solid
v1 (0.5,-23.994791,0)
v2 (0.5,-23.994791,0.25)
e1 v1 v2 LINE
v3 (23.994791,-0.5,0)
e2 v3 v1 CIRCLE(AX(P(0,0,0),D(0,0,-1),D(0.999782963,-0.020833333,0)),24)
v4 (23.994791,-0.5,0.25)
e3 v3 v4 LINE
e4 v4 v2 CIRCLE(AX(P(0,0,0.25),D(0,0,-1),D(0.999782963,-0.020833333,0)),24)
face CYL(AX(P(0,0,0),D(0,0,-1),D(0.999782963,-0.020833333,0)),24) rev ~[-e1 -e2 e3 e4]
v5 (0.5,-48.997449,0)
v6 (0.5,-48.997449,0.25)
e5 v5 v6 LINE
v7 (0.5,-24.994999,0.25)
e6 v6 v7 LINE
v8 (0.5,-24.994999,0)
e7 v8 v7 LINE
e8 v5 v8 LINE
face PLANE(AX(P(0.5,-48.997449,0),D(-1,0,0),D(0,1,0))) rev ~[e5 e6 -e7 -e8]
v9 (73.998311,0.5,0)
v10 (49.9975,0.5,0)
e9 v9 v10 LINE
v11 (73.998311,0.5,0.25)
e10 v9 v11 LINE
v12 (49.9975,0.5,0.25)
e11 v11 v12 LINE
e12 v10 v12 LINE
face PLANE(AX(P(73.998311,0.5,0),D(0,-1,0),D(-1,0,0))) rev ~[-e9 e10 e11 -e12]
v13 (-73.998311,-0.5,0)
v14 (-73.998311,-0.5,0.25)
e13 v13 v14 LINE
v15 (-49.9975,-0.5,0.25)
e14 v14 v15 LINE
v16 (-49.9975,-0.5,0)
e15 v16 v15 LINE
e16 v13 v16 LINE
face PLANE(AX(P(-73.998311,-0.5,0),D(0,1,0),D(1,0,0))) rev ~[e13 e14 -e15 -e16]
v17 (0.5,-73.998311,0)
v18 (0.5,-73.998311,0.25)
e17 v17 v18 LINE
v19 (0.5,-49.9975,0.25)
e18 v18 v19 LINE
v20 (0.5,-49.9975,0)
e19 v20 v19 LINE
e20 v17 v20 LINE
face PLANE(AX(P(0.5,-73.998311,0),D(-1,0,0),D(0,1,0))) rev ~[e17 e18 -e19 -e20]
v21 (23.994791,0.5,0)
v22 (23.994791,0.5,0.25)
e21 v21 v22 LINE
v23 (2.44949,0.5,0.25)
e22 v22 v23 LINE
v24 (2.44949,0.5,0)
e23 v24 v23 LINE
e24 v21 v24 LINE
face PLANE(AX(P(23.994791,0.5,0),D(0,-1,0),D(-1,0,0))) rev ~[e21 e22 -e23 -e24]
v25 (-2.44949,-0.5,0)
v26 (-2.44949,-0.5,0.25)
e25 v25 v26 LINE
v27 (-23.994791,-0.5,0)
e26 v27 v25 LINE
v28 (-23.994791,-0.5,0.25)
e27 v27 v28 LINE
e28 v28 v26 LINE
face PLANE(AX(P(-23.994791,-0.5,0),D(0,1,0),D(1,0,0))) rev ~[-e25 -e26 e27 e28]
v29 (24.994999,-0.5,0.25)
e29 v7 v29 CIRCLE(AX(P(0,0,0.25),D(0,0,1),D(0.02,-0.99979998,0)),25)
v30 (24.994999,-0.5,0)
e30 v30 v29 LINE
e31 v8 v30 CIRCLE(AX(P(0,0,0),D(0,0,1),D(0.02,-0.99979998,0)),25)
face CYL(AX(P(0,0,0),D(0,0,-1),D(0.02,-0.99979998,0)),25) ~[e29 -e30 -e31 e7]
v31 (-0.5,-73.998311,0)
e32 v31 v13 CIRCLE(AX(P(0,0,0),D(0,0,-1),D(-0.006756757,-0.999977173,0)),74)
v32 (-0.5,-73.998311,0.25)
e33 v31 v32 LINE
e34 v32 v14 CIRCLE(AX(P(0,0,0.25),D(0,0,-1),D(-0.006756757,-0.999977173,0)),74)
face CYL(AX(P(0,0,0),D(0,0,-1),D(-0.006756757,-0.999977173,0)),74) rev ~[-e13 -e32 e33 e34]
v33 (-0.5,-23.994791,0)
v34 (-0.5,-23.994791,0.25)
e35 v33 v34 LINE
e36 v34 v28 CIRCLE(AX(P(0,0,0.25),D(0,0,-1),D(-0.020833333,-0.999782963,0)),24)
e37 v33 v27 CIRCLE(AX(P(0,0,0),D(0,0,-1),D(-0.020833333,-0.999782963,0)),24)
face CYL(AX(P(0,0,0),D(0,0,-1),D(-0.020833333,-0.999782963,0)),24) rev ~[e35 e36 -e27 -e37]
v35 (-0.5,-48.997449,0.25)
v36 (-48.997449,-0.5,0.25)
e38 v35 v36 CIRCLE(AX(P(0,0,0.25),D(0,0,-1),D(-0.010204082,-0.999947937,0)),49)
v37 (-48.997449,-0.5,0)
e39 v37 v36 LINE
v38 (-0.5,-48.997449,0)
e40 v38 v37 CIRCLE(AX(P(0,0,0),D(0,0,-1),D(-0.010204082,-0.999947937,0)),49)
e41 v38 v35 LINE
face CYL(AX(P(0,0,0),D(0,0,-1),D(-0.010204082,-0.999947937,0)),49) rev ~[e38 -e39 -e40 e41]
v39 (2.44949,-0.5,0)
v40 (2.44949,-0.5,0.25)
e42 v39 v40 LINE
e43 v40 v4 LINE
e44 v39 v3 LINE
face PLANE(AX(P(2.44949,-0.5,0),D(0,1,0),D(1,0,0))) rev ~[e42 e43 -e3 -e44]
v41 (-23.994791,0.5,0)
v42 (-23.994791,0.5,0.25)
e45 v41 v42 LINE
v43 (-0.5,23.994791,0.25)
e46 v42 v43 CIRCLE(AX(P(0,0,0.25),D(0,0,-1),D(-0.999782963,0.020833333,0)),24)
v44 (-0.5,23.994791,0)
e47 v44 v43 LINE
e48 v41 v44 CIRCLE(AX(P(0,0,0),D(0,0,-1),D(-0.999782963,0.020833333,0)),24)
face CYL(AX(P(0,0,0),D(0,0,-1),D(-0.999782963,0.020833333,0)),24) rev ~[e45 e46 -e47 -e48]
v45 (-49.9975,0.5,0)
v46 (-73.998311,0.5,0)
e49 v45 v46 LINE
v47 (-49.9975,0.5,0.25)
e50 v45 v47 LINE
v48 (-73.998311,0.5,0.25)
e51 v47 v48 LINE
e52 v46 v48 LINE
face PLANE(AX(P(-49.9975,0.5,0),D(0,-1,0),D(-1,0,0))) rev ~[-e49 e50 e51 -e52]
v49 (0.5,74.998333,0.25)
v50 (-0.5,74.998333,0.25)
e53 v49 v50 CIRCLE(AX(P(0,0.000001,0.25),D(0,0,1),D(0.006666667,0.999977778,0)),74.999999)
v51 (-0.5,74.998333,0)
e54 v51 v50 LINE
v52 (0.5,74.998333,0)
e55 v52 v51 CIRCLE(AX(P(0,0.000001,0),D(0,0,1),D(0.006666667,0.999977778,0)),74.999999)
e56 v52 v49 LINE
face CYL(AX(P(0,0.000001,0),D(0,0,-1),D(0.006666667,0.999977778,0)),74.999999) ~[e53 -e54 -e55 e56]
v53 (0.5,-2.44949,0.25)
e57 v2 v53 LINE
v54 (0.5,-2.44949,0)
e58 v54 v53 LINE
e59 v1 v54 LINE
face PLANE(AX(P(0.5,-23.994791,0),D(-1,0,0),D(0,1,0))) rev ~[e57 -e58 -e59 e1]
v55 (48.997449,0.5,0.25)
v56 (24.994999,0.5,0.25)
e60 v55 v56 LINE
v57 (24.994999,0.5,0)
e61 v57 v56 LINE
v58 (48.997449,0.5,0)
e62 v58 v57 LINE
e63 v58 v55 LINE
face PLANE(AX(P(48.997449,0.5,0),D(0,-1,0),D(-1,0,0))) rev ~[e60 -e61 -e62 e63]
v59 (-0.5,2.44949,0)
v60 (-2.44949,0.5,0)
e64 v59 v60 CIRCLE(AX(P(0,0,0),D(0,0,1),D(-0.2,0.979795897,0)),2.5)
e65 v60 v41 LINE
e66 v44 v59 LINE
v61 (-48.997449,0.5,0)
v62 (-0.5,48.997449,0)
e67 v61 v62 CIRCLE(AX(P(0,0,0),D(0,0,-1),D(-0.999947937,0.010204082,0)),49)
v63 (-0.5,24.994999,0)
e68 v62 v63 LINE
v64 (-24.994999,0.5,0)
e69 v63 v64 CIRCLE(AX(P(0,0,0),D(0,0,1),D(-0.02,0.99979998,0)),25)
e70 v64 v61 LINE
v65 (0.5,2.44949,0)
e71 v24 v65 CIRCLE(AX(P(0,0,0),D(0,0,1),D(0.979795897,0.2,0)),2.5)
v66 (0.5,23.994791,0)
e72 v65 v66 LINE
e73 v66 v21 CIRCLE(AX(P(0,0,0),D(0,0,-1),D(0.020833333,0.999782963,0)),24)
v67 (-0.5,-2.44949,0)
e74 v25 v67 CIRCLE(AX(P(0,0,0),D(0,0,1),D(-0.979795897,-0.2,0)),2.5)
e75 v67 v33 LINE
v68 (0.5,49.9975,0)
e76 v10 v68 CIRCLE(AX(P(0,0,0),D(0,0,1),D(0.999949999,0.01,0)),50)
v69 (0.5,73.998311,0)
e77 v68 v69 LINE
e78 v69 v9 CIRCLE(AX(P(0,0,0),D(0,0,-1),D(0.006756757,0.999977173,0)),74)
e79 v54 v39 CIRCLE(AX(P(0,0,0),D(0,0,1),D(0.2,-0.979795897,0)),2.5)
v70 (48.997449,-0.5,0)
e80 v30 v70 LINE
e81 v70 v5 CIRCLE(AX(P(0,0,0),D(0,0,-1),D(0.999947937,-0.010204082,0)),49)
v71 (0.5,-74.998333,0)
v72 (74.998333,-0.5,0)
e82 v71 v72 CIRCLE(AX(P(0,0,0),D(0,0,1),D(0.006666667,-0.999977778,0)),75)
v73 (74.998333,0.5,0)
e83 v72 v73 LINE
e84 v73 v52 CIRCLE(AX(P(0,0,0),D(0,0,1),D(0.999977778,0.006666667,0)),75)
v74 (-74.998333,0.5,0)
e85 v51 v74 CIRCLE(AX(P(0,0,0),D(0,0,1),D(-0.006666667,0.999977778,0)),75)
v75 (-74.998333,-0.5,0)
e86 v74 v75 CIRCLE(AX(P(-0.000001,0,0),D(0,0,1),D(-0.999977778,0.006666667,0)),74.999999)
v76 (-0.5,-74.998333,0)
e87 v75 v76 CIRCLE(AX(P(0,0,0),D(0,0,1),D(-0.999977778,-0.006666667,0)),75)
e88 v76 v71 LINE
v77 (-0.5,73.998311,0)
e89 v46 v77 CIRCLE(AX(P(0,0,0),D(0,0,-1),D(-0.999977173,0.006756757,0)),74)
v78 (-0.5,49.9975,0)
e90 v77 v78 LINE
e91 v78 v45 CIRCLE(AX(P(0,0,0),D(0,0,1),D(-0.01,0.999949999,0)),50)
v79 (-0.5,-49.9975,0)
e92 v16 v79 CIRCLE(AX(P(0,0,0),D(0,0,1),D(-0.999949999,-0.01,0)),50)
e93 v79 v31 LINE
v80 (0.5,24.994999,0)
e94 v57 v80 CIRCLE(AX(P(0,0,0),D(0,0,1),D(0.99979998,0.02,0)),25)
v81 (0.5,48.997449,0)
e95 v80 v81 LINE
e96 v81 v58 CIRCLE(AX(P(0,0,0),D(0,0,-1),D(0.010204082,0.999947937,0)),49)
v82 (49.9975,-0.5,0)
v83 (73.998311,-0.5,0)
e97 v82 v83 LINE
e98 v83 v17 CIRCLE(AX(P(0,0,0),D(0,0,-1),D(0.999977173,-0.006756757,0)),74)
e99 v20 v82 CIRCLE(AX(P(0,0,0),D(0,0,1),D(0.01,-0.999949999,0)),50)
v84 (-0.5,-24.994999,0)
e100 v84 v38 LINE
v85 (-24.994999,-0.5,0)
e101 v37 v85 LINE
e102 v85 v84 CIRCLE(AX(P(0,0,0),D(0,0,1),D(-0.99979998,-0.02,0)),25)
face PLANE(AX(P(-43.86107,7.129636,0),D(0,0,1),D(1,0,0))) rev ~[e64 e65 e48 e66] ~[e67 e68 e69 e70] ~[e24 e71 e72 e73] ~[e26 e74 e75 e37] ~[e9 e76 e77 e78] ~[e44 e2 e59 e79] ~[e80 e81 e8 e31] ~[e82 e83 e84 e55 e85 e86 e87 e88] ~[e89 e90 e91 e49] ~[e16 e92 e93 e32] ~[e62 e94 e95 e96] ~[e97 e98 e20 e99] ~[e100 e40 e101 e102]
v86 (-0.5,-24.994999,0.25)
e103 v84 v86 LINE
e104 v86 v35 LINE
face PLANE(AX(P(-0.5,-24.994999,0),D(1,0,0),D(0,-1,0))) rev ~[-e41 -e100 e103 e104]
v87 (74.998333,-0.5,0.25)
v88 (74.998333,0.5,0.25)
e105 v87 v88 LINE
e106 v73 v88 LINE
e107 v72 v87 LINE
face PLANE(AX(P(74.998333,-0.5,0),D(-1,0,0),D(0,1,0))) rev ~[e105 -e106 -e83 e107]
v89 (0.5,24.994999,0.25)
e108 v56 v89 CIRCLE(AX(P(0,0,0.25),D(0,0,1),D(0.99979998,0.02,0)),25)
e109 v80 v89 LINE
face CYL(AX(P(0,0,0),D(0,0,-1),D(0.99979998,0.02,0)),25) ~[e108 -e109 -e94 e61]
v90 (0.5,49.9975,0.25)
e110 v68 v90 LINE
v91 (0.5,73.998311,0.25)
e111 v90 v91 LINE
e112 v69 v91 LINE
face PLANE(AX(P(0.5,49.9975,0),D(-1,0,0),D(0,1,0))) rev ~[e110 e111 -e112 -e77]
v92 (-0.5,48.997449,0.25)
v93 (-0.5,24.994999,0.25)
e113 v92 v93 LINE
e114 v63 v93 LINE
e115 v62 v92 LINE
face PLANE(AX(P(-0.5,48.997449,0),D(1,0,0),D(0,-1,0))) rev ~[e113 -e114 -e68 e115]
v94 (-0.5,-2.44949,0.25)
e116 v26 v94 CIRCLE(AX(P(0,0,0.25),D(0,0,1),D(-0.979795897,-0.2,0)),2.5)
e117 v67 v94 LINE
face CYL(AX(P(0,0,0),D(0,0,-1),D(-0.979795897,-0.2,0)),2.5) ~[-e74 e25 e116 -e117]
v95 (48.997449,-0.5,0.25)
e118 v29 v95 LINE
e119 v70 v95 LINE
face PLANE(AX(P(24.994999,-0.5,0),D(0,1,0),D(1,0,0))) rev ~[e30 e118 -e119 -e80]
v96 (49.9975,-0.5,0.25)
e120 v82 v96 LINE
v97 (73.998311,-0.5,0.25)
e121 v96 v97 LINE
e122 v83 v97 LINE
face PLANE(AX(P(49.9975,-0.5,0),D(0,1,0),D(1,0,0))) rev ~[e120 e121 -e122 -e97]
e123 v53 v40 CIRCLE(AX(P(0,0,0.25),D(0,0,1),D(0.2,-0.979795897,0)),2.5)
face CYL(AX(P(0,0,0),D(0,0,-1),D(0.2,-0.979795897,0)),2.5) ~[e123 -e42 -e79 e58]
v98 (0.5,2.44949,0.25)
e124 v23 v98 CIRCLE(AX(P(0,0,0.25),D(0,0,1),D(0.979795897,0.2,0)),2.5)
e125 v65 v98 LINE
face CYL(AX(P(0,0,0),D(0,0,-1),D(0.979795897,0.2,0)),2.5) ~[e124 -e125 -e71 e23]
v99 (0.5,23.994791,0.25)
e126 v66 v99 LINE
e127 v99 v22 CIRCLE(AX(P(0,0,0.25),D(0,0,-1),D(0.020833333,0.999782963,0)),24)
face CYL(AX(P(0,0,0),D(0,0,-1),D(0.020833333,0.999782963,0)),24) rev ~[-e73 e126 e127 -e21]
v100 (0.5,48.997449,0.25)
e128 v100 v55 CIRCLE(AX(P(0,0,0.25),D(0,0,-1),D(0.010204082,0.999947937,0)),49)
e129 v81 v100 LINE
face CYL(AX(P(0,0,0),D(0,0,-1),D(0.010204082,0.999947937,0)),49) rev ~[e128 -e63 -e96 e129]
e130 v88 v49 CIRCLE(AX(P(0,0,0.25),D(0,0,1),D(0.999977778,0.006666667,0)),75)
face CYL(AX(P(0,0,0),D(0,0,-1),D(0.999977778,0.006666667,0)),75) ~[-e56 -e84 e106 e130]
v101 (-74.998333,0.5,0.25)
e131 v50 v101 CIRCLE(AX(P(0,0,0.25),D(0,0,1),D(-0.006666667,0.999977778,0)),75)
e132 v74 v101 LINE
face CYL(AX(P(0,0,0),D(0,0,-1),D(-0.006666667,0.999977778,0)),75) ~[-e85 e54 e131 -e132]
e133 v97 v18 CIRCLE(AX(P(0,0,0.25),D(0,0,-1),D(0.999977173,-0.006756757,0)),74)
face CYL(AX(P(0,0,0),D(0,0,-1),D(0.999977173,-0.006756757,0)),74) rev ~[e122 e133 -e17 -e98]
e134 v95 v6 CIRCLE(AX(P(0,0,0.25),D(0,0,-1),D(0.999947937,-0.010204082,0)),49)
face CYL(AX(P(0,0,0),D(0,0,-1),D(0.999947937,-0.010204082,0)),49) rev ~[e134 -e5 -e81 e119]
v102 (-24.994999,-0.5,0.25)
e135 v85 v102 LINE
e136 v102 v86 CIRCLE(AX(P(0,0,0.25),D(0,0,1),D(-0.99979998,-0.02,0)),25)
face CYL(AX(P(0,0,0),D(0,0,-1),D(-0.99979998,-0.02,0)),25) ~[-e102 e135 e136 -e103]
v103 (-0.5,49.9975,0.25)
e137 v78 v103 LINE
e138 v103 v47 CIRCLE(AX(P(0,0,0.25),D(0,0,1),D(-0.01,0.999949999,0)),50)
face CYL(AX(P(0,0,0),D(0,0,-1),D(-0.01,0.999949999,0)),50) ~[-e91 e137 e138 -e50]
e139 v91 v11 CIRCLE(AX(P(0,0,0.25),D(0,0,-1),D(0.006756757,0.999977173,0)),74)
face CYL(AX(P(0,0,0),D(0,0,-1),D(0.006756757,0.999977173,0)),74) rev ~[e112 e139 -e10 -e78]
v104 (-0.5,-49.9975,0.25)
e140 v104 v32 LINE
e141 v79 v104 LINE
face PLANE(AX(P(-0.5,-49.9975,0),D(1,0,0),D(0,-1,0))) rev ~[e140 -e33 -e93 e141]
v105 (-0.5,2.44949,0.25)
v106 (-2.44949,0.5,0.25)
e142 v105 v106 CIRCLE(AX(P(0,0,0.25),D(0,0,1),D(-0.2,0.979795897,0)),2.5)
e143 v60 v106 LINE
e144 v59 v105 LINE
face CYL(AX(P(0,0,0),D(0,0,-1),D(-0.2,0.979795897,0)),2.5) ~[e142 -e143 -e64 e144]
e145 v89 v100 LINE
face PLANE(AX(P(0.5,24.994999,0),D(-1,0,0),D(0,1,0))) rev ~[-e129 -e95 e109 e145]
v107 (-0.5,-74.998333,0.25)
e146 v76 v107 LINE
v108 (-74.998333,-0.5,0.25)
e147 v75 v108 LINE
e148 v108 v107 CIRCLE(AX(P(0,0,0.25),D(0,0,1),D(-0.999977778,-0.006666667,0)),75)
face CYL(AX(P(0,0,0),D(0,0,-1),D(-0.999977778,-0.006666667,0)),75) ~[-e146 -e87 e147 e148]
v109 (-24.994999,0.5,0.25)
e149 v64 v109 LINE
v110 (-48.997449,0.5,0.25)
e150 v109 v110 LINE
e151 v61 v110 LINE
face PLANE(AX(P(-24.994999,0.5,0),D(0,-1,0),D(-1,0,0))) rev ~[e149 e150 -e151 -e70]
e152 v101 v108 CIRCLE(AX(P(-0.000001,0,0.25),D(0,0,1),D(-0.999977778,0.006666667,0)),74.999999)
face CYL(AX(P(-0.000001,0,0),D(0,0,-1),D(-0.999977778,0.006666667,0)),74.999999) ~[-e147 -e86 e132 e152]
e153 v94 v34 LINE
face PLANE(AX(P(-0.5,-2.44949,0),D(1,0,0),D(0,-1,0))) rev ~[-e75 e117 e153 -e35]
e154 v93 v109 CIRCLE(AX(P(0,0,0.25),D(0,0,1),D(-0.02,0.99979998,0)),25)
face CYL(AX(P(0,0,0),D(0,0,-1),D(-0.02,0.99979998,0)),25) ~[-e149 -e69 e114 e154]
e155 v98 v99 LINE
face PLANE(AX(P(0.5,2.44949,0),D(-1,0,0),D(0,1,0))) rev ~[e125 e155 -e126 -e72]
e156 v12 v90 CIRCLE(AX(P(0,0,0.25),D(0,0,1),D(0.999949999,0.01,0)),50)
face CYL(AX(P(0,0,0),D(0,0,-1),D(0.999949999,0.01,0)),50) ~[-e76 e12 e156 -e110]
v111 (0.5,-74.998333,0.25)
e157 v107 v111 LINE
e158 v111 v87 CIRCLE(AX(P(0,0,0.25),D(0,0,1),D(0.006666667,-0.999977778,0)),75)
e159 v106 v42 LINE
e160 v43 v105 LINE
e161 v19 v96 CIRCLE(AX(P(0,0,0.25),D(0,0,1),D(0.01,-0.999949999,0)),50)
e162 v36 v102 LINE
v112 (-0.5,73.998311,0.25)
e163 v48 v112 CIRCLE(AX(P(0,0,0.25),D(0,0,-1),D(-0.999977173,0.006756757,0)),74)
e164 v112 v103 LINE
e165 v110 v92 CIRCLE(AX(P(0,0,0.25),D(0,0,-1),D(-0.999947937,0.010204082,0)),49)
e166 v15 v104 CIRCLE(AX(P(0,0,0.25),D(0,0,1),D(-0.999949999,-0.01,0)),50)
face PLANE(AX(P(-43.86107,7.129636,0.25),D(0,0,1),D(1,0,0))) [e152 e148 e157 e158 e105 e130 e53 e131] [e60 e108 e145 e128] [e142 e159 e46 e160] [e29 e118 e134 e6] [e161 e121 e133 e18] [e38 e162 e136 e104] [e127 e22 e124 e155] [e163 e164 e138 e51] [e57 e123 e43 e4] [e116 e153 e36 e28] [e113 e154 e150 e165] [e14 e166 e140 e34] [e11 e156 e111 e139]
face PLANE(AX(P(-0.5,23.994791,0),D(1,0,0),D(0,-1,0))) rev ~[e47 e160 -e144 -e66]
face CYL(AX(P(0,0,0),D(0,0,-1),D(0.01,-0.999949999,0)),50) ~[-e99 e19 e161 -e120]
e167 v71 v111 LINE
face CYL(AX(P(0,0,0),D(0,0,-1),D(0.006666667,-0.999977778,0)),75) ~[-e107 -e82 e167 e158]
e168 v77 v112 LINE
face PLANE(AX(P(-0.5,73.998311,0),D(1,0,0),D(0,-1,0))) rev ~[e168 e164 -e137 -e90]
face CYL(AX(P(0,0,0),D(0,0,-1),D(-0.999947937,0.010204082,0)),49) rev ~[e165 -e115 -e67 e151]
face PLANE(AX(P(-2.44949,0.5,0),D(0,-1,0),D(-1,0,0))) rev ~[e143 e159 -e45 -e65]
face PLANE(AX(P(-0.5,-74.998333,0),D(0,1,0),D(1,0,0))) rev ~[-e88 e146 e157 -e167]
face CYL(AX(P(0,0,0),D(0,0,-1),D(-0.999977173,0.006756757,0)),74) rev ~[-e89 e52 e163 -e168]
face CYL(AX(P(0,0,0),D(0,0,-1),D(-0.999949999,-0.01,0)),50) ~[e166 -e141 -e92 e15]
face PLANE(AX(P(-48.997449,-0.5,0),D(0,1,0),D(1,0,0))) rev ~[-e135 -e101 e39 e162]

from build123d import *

# Parameters (mm, degrees)
F1_DEPTH = 0.25


with BuildPart() as f1:
    # F0 (on Top) → F1 (new body)
    with BuildSketch(Plane.XY):
        with BuildLine():
            ThreePointArc((-0.5, -73.9983107915), (-52.3259018078, -52.3259018078), (-73.9983107915, -0.5))
            Line((-73.9983107915, -0.5), (-49.9974999375, -0.5))
            Line((-49.9974999375, -0.5), (-48.9974489132, -0.5))
            ThreePointArc((-48.9974489132, -0.5), (-49, 0), (-48.9974489132, 0.5))
            ThreePointArc((-48.9974489132, 0.5), (-34.6482322781, 34.6482322781), (-0.5, 48.9974489132))
            Line((-0.5, 48.9974489132), (-0.5, 49.9974999375))
            ThreePointArc((-0.5, 49.9974999375), (-35.3553390593, 35.3553390593), (-49.9974999375, 0.5))
            Line((-49.9974999375, 0.5), (-73.9983107915, 0.5))
            ThreePointArc((-73.9983107915, 0.5), (-52.3259018078, 52.3259018078), (-0.5, 73.9983107915))
            Line((-0.5, 73.9983107915), (-0.5, 74.9983333148))
            ThreePointArc((-0.5, 74.9983333148), (-53.033008589, 53.033008589), (-74.9983333148, 0.5))
            Line((-74.9983333148, 0.5), (-74.9983333148, -0.5))
            ThreePointArc((-74.9983333148, -0.5), (-53.033008589, -53.033008589), (-0.5, -74.9983333148))
            Line((-0.5, -74.9983333148), (-0.5, -73.9983107915))
        make_face()
        with BuildLine():
            Line((-0.5, -49.9974999375), (-0.5, -73.9983107915))
            ThreePointArc((-0.5, -73.9983107915), (0, -74), (0.5, -73.9983107915))
            Line((0.5, -73.9983107915), (0.5, -49.9974999375))
            ThreePointArc((0.5, -49.9974999375), (0, -50), (-0.5, -49.9974999375))
        make_face()
        with BuildLine():
            ThreePointArc((0.5, -73.9983107915), (0, -74), (-0.5, -73.9983107915))
            Line((-0.5, -73.9983107915), (-0.5, -74.9983333148))
            Line((-0.5, -74.9983333148), (0.5, -74.9983333148))
            Line((0.5, -74.9983333148), (0.5, -73.9983107915))
        make_face()
        with BuildLine():
            Line((-48.9974489132, -0.5), (-49.9974999375, -0.5))
            ThreePointArc((-49.9974999375, -0.5), (-35.3553390593, -35.3553390593), (-0.5, -49.9974999375))
            ThreePointArc((-0.5, -49.9974999375), (0, -50), (0.5, -49.9974999375))
            Line((0.5, -49.9974999375), (0.5, -48.9974489132))
            ThreePointArc((0.5, -48.9974489132), (0, -49), (-0.5, -48.9974489132))
            ThreePointArc((-0.5, -48.9974489132), (-34.6482322781, -34.6482322781), (-48.9974489132, -0.5))
        make_face()
        with BuildLine():
            ThreePointArc((73.9983107915, -0.5), (52.3259018078, -52.3259018078), (0.5, -73.9983107915))
            Line((0.5, -73.9983107915), (0.5, -74.9983333148))
            ThreePointArc((0.5, -74.9983333148), (53.033008589, -53.033008589), (74.9983333148, -0.5))
            Line((74.9983333148, -0.5), (73.9983107915, -0.5))
        make_face()
        with BuildLine():
            ThreePointArc((-48.9974489132, 0.5), (-49, 0), (-48.9974489132, -0.5))
            Line((-48.9974489132, -0.5), (-24.9949994999, -0.5))
            Line((-24.9949994999, -0.5), (-23.9947911014, -0.5))
            ThreePointArc((-23.9947911014, -0.5), (-24, 0), (-23.9947911014, 0.5))
            ThreePointArc((-23.9947911014, 0.5), (-16.9705627485, 16.9705627485), (-0.5, 23.9947911014))
            Line((-0.5, 23.9947911014), (-0.5, 24.9949994999))
            ThreePointArc((-0.5, 24.9949994999), (-17.6776695297, 17.6776695297), (-24.9949994999, 0.5))
            Line((-24.9949994999, 0.5), (-48.9974489132, 0.5))
        make_face()
        with BuildLine():
            Line((49.9974999375, -0.5), (73.9983107915, -0.5))
            ThreePointArc((73.9983107915, -0.5), (74, 0), (73.9983107915, 0.5))
            Line((73.9983107915, 0.5), (49.9974999375, 0.5))
            ThreePointArc((49.9974999375, 0.5), (50, 0), (49.9974999375, -0.5))
        make_face()
        with BuildLine():
            ThreePointArc((73.9983107915, 0.5), (74, 0), (73.9983107915, -0.5))
            Line((73.9983107915, -0.5), (74.9983333148, -0.5))
            Line((74.9983333148, -0.5), (74.9983333148, 0.5))
            Line((74.9983333148, 0.5), (73.9983107915, 0.5))
        make_face()
        with BuildLine():
            Line((0.5, -48.9974489132), (0.5, -49.9974999375))
            ThreePointArc((0.5, -49.9974999375), (35.3553390593, -35.3553390593), (49.9974999375, -0.5))
            Line((49.9974999375, -0.5), (48.9974489132, -0.5))
            ThreePointArc((48.9974489132, -0.5), (34.6482322781, -34.6482322781), (0.5, -48.9974489132))
        make_face()
        with BuildLine():
            ThreePointArc((-74.9983333148, 0.5), (-75, 0), (-74.9983333148, -0.5))
            Line((-74.9983333148, -0.5), (-74.9983333148, 0.5))
        make_face()
        with BuildLine():
            Line((-23.9947911014, -0.5), (-24.9949994999, -0.5))
            ThreePointArc((-24.9949994999, -0.5), (-17.6776695297, -17.6776695297), (-0.5, -24.9949994999))
            Line((-0.5, -24.9949994999), (-0.5, -48.9974489132))
            ThreePointArc((-0.5, -48.9974489132), (0, -49), (0.5, -48.9974489132))
            Line((0.5, -48.9974489132), (0.5, -24.9949994999))
            Line((0.5, -24.9949994999), (0.5, -23.9947911014))
            Line((0.5, -23.9947911014), (0.5, -2.4494897428))
            Line((0.5, -2.4494897428), (0.5, -0.5))
            Line((0.5, -0.5), (2.4494897428, -0.5))
            Line((2.4494897428, -0.5), (23.9947911014, -0.5))
            Line((23.9947911014, -0.5), (24.9949994999, -0.5))
            ThreePointArc((24.9949994999, -0.5), (25, 0), (24.9949994999, 0.5))
            Line((24.9949994999, 0.5), (23.9947911014, 0.5))
            Line((23.9947911014, 0.5), (2.4494897428, 0.5))
            Line((2.4494897428, 0.5), (0.5, 0.5))
            Line((0.5, 0.5), (-0.5, 0.5))
            Line((-0.5, 0.5), (-0.5, -0.5))
            Line((-0.5, -0.5), (-0.5, -2.4494897428))
            Line((-0.5, -2.4494897428), (-0.5, -23.9947911014))
            ThreePointArc((-0.5, -23.9947911014), (-16.9705627485, -16.9705627485), (-23.9947911014, -0.5))
        make_face()
        with BuildLine():
            ThreePointArc((0.5, 73.9983107915), (52.3259018078, 52.3259018078), (73.9983107915, 0.5))
            Line((73.9983107915, 0.5), (74.9983333148, 0.5))
            ThreePointArc((74.9983333148, 0.5), (53.033008589, 53.033008589), (0.5, 74.9983333148))
            Line((0.5, 74.9983333148), (0.5, 73.9983107915))
        make_face()
        with BuildLine():
            Line((48.9974489132, -0.5), (49.9974999375, -0.5))
            ThreePointArc((49.9974999375, -0.5), (50, 0), (49.9974999375, 0.5))
            Line((49.9974999375, 0.5), (48.9974489132, 0.5))
            ThreePointArc((48.9974489132, 0.5), (49, 0), (48.9974489132, -0.5))
        make_face()
        with BuildLine():
            Line((-0.5, 49.9974999375), (-0.5, 48.9974489132))
            ThreePointArc((-0.5, 48.9974489132), (0, 49), (0.5, 48.9974489132))
            Line((0.5, 48.9974489132), (0.5, 49.9974999375))
            ThreePointArc((0.5, 49.9974999375), (0, 50), (-0.5, 49.9974999375))
        make_face()
        with BuildLine():
            ThreePointArc((0.5, 48.9974489132), (0, 49), (-0.5, 48.9974489132))
            Line((-0.5, 48.9974489132), (-0.5, 24.9949994999))
            Line((-0.5, 24.9949994999), (-0.5, 23.9947911014))
            ThreePointArc((-0.5, 23.9947911014), (0, 24), (0.5, 23.9947911014))
            ThreePointArc((0.5, 23.9947911014), (16.9705627485, 16.9705627485), (23.9947911014, 0.5))
            Line((23.9947911014, 0.5), (24.9949994999, 0.5))
            ThreePointArc((24.9949994999, 0.5), (17.6776695297, 17.6776695297), (0.5, 24.9949994999))
            Line((0.5, 24.9949994999), (0.5, 48.9974489132))
        make_face()
        with BuildLine():
            ThreePointArc((-23.9947911014, 0.5), (-24, 0), (-23.9947911014, -0.5))
            Line((-23.9947911014, -0.5), (-2.4494897428, -0.5))
            Line((-2.4494897428, -0.5), (-0.5, -0.5))
            Line((-0.5, -0.5), (-0.5, 0.5))
            Line((-0.5, 0.5), (-2.4494897428, 0.5))
            Line((-2.4494897428, 0.5), (-23.9947911014, 0.5))
        make_face()
        with BuildLine():
            Line((0.5, 49.9974999375), (0.5, 73.9983107915))
            ThreePointArc((0.5, 73.9983107915), (0, 74), (-0.5, 73.9983107915))
            Line((-0.5, 73.9983107915), (-0.5, 49.9974999375))
            ThreePointArc((-0.5, 49.9974999375), (0, 50), (0.5, 49.9974999375))
        make_face()
        with BuildLine():
            ThreePointArc((-0.5, 73.9983107915), (0, 74), (0.5, 73.9983107915))
            Line((0.5, 73.9983107915), (0.5, 74.9983333148))
            Line((0.5, 74.9983333148), (-0.5, 74.9983333148))
            Line((-0.5, 74.9983333148), (-0.5, 73.9983107915))
        make_face()
        with BuildLine():
            Line((48.9974489132, 0.5), (49.9974999375, 0.5))
            ThreePointArc((49.9974999375, 0.5), (35.3553390593, 35.3553390593), (0.5, 49.9974999375))
            Line((0.5, 49.9974999375), (0.5, 48.9974489132))
            ThreePointArc((0.5, 48.9974489132), (34.6482322781, 34.6482322781), (48.9974489132, 0.5))
        make_face()
        with BuildLine():
            Line((24.9949994999, -0.5), (48.9974489132, -0.5))
            ThreePointArc((48.9974489132, -0.5), (49, 0), (48.9974489132, 0.5))
            Line((48.9974489132, 0.5), (24.9949994999, 0.5))
            ThreePointArc((24.9949994999, 0.5), (25, 0), (24.9949994999, -0.5))
        make_face()
        with BuildLine():
            Line((0.5, -23.9947911014), (0.5, -24.9949994999))
            ThreePointArc((0.5, -24.9949994999), (17.6776695297, -17.6776695297), (24.9949994999, -0.5))
            Line((24.9949994999, -0.5), (23.9947911014, -0.5))
            ThreePointArc((23.9947911014, -0.5), (16.9705627485, -16.9705627485), (0.5, -23.9947911014))
        make_face()
        with BuildLine():
            ThreePointArc((0.5, 74.9983333148), (0, 75), (-0.5, 74.9983333148))
            Line((-0.5, 74.9983333148), (0.5, 74.9983333148))
        make_face()
        with BuildLine():
            Line((-0.5, -0.5), (-2.4494897428, -0.5))
            ThreePointArc((-2.4494897428, -0.5), (-1.767766953, -1.767766953), (-0.5, -2.4494897428))
            Line((-0.5, -2.4494897428), (-0.5, -0.5))
        make_face()
        with BuildLine():
            ThreePointArc((0.5, 23.9947911014), (0, 24), (-0.5, 23.9947911014))
            Line((-0.5, 23.9947911014), (-0.5, 2.4494897428))
            Line((-0.5, 2.4494897428), (-0.5, 0.5))
            Line((-0.5, 0.5), (0.5, 0.5))
            Line((0.5, 0.5), (0.5, 2.4494897428))
            Line((0.5, 2.4494897428), (0.5, 23.9947911014))
        make_face()
        with BuildLine():
            ThreePointArc((-0.5, 2.4494897428), (-1.767766953, 1.767766953), (-2.4494897428, 0.5))
            Line((-2.4494897428, 0.5), (-0.5, 0.5))
            Line((-0.5, 0.5), (-0.5, 2.4494897428))
        make_face()
        with BuildLine():
            Line((0.5, -0.5), (0.5, -2.4494897428))
            ThreePointArc((0.5, -2.4494897428), (1.767766953, -1.767766953), (2.4494897428, -0.5))
            Line((2.4494897428, -0.5), (0.5, -0.5))
        make_face()
        with BuildLine():
            ThreePointArc((2.4494897428, 0.5), (1.767766953, 1.767766953), (0.5, 2.4494897428))
            Line((0.5, 2.4494897428), (0.5, 0.5))
            Line((0.5, 0.5), (2.4494897428, 0.5))
        make_face()
    extrude(amount=F1_DEPTH)


solid = f1.part
